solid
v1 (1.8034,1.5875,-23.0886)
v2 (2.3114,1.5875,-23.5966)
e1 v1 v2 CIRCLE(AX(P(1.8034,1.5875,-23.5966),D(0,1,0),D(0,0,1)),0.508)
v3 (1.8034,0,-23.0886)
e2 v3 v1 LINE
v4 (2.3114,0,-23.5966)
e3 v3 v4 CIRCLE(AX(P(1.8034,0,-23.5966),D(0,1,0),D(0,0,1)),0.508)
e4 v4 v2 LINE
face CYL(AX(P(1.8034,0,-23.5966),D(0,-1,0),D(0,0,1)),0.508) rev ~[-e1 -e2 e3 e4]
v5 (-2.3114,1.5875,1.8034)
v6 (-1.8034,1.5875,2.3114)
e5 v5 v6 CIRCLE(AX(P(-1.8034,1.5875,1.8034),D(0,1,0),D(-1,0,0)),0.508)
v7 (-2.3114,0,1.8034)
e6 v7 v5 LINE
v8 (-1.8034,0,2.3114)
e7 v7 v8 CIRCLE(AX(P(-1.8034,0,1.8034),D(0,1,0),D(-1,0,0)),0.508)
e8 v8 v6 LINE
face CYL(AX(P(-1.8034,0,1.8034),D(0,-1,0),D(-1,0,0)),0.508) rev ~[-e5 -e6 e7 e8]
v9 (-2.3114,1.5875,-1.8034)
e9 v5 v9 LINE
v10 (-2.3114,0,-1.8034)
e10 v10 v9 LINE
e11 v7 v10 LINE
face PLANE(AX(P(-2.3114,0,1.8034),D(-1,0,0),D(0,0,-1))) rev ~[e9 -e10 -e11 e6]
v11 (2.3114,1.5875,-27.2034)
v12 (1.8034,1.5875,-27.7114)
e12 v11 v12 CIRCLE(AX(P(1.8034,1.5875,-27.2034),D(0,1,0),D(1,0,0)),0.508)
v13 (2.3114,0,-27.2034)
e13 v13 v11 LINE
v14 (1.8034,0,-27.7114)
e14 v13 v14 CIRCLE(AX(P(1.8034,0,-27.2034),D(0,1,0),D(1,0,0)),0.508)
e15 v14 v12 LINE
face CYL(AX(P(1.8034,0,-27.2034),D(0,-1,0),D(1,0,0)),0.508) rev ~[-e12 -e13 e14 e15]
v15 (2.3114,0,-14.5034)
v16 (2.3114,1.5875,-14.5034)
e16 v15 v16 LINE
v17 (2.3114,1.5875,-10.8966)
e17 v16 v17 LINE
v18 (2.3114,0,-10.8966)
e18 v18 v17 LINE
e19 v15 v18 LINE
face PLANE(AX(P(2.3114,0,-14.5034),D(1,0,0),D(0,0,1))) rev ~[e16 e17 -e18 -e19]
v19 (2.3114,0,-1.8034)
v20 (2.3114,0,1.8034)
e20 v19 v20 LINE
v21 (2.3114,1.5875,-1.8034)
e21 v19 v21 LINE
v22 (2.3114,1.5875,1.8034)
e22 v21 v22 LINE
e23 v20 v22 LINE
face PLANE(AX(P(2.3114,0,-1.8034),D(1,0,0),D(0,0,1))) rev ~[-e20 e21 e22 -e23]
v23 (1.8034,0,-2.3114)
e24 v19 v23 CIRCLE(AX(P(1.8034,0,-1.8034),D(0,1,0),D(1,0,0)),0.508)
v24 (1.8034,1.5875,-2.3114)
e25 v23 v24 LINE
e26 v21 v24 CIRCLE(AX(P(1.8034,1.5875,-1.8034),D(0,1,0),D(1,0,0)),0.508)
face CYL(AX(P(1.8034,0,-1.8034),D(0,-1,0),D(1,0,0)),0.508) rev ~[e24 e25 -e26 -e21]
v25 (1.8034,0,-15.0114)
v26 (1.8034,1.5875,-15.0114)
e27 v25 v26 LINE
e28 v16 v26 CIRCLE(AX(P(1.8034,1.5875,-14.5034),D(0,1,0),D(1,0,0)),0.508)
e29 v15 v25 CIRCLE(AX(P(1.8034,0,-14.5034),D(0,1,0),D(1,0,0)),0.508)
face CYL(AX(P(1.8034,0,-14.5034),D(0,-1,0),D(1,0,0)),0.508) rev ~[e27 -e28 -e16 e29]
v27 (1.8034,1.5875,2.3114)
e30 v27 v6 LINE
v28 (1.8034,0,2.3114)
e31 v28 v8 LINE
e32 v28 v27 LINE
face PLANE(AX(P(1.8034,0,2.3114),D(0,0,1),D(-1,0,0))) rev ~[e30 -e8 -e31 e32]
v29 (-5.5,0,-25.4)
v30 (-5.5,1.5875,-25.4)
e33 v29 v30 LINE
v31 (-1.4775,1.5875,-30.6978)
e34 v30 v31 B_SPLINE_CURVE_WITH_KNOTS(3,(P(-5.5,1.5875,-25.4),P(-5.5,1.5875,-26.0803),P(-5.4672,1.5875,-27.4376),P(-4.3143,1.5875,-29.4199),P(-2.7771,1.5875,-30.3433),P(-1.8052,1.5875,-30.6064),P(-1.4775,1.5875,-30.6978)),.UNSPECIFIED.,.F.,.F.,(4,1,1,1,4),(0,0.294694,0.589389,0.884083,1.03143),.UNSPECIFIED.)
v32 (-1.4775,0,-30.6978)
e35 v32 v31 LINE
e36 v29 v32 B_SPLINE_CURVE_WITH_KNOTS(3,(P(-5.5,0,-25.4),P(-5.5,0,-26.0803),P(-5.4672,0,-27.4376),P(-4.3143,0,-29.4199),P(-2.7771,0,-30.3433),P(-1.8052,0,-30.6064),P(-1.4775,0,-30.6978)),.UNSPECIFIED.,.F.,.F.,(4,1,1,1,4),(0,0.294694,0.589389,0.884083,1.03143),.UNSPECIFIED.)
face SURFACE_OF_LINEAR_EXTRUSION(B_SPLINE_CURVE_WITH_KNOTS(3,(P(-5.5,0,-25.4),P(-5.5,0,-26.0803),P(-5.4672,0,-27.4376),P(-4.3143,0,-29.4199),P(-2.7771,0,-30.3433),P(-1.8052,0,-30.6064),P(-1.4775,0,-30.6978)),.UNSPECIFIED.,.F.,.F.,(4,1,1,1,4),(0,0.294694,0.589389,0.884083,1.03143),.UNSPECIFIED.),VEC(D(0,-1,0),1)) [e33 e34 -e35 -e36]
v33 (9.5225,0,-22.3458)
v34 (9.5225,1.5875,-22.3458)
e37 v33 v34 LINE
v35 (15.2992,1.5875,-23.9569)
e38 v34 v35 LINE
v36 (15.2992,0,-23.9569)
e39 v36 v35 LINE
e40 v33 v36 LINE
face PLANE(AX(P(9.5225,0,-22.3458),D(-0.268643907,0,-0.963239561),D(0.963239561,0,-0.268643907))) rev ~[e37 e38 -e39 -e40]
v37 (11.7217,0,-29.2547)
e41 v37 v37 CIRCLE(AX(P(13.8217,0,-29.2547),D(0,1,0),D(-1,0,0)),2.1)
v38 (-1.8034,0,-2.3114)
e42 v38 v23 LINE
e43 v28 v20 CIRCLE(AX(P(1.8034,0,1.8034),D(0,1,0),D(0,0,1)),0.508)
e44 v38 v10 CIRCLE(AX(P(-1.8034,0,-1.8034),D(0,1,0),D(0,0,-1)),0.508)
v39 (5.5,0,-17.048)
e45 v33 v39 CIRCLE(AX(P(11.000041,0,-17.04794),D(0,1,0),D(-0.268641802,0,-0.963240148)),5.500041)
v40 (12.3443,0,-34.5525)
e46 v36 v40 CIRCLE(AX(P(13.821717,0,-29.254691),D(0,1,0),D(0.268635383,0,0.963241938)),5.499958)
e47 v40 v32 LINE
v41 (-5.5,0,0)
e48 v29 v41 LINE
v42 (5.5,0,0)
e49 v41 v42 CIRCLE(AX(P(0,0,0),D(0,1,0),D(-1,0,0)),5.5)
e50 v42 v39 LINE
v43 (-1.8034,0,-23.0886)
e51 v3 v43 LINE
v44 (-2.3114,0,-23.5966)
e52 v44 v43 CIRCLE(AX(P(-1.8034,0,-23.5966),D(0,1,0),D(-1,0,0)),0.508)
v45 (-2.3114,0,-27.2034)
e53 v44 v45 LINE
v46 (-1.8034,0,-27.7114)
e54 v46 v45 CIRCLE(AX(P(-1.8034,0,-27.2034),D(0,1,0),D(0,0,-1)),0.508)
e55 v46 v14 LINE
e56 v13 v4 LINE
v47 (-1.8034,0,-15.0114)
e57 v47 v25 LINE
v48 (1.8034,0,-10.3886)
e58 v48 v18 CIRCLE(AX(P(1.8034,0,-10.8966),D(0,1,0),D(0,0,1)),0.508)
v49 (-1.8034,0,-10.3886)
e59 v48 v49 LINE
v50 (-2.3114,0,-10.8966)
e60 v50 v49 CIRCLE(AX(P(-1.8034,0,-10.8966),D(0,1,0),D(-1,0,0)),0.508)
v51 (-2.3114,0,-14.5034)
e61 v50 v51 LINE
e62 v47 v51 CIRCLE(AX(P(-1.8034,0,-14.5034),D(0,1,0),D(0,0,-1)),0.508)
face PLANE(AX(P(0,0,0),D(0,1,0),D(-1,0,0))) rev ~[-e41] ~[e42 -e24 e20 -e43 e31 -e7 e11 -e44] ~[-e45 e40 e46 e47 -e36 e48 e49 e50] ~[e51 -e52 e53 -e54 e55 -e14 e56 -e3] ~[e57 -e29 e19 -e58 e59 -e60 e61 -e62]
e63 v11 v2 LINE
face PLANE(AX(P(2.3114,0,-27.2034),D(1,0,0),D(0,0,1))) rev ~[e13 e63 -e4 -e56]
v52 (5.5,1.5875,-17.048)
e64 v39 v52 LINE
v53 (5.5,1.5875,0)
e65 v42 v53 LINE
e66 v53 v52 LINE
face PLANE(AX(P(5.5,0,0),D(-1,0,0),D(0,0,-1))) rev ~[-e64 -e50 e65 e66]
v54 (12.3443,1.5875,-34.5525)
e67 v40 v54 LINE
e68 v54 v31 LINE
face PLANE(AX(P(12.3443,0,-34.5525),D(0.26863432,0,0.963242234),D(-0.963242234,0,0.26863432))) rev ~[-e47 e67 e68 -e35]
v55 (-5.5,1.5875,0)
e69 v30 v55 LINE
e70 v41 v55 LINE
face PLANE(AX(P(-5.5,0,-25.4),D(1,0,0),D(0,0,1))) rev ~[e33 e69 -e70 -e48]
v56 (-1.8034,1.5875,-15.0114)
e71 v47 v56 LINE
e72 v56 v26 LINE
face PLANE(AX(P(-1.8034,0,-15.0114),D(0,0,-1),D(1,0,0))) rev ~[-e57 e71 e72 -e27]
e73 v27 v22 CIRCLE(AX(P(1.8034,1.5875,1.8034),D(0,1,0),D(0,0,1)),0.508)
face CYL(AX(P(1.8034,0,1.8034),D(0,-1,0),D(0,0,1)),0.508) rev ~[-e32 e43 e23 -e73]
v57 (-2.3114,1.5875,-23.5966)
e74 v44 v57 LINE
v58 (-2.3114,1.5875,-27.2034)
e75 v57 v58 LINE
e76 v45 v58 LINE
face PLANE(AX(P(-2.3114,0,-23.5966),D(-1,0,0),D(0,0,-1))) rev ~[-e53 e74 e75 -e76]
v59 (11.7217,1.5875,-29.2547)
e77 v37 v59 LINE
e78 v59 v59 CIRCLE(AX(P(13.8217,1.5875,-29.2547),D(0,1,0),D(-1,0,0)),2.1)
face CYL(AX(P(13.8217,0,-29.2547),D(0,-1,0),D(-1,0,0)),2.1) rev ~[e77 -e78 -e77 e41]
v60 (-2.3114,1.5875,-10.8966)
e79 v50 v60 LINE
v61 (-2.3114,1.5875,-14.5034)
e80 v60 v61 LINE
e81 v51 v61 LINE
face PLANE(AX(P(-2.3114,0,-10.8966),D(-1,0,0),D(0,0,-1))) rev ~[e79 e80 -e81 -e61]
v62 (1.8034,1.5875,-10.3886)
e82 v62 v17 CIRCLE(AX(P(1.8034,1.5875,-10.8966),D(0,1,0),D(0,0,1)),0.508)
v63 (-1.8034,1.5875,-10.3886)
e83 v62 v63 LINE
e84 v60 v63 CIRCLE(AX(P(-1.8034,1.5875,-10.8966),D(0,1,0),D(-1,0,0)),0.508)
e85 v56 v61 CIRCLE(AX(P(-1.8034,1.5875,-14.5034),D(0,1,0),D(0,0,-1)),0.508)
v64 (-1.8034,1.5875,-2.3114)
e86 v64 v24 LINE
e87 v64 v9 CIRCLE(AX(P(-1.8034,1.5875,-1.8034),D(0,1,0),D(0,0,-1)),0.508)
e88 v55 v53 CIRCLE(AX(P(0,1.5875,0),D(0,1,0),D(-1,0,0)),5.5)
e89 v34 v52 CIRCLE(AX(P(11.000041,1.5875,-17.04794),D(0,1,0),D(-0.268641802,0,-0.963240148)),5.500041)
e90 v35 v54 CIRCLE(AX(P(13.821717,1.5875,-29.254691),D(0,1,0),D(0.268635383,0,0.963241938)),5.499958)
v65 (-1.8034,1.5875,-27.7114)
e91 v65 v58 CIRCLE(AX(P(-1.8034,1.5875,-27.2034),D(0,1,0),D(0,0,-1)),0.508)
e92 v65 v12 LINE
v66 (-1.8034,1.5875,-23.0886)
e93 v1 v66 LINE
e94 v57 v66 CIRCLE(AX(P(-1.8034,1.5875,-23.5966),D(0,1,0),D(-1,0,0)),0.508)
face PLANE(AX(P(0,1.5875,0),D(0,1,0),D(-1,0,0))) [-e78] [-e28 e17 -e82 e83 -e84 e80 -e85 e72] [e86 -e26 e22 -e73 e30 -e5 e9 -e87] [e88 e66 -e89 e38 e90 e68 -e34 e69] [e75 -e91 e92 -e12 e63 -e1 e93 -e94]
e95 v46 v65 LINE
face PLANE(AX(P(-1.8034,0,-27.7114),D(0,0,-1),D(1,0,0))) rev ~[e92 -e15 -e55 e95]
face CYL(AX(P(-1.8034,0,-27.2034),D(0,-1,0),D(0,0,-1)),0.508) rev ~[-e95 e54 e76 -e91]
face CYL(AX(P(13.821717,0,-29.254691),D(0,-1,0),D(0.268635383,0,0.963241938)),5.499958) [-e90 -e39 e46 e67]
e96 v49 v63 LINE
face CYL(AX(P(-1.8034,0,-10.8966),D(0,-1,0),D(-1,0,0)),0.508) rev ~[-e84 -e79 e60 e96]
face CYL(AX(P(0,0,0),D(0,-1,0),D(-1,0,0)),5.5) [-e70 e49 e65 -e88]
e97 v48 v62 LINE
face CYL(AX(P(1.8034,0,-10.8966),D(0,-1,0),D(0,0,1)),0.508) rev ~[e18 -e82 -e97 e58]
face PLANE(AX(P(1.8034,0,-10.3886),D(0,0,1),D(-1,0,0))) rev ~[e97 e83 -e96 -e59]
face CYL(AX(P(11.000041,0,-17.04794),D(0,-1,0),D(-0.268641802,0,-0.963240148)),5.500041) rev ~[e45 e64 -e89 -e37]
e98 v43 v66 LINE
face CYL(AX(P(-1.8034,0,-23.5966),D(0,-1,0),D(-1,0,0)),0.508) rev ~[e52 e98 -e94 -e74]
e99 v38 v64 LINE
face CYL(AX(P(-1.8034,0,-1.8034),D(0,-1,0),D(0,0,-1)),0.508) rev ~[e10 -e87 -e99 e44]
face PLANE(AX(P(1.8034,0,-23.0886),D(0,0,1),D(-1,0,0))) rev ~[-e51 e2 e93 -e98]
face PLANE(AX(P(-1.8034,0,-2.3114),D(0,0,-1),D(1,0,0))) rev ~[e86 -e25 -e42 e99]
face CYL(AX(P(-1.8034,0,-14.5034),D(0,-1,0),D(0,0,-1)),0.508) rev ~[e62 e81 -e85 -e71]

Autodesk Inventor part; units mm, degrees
ref_plane "YZ Plane" through (0, 0, 0) normal (1, 0, 0) x (0, 1, 0)
ref_plane "XZ Plane" through (0, 0, 0) normal (0, 1, 0) x (-1, 0, 0)
ref_plane "XY Plane" through (0, 0, 0) normal (0, 0, 1) x (1, 0, 0)
sketch "main" plane through (0, 0, 0) normal (0, 0, 1) x (1, 0, 0)
  line L0 (-3.1973, -8.3156) -> (0.4095, -8.3156)
  arc A0 (-3.1973, -8.3156) -> (-3.7053, -8.8236) centre (-3.1973, -8.8236) ccw
  arc A1 (0.9175, -8.8236) -> (0.4095, -8.3156) centre (0.4095, -8.8236) ccw
  line L1 (-3.7053, -12.4304) -> (-3.7053, -8.8236)
  line L2 (0.9175, -8.8236) -> (0.9175, -12.4304)
  arc A2 (-3.7053, -12.4304) -> (-3.1973, -12.9384) centre (-3.1973, -12.4304) ccw
  line L3 (0.4095, -12.9384) -> (-3.1973, -12.9384)
  arc A3 (0.4095, -12.9384) -> (0.9175, -12.4304) centre (0.4095, -12.4304) ccw
  spline S0 degree 3 poles (4.1061, -10.627) (4.1061, -11.3073) (4.0733, -12.6645) (2.9205, -14.6469) (1.3832, -15.5703) (0.4113, -15.8334) (0.0836, -15.9248) knots 0 0 0 0 0.294694 0.589389 0.884083 1.03143 1.03143 1.03143 1.03143
  arc A4 (-10.9164, -7.5728) -> (-6.8939, -2.275) centre (-12.3939, -2.275) ccw
  line L4 (-13.7381, -19.7795) -> (0.0836, -15.9248)
  line L5 (-10.9164, -7.5728) -> (-16.6931, -9.1839)
  arc A5 (-16.6931, -9.1839) -> (-13.7381, -19.7795) centre (-15.2156, -14.4817) ccw
  circle A6 centre (-15.2156, -14.4817) radius 2.1
  line L6 (0.4095, -0.2384) -> (-3.1973, -0.2384)
  arc A7 (-3.7053, 0.2696) -> (-3.1973, -0.2384) centre (-3.1973, 0.2696) ccw
  line L7 (0.9175, 3.8764) -> (0.9175, 0.2696)
  line L8 (-3.7053, 0.2696) -> (-3.7053, 3.8764)
  line L9 (-3.1973, 4.3844) -> (0.4095, 4.3844)
  arc A8 (-3.1973, 4.3844) -> (-3.7053, 3.8764) centre (-3.1973, 3.8764) ccw
  arc A9 (0.9175, 3.8764) -> (0.4095, 4.3844) centre (0.4095, 3.8764) ccw
  arc A10 (0.4095, -0.2384) -> (0.9175, 0.2696) centre (0.4095, 0.2696) ccw
  line L10 (4.1061, -10.627) -> (4.1061, 14.773)
  arc A11 (4.1061, 14.773) -> (-6.8939, 14.773) centre (-1.3939, 14.773) ccw
  line L11 (-6.8939, 14.773) -> (-6.8939, -2.275)
  line L12 (0.4095, 12.4616) -> (-3.1973, 12.4616)
  arc A12 (0.4095, 12.4616) -> (0.9175, 12.9696) centre (0.4095, 12.9696) ccw
  arc A13 (-3.7053, 12.9696) -> (-3.1973, 12.4616) centre (-3.1973, 12.9696) ccw
  line L13 (0.9175, 16.5764) -> (0.9175, 12.9696)
  line L14 (-3.7053, 12.9696) -> (-3.7053, 16.5764)
  arc A14 (-3.1973, 17.0844) -> (-3.7053, 16.5764) centre (-3.1973, 16.5764) ccw
  arc A15 (0.9175, 16.5764) -> (0.4095, 17.0844) centre (0.4095, 16.5764) ccw
  line L15 (-3.1973, 17.0844) -> (0.4095, 17.0844)
  point P0 (-2.9609, 0.4438)
  point P1 (-20.5005, 14.8552)
sketch "Sketch1" plane through (0, 0, 0) normal (0, 1, 0) x (-1, 0, 0)
  line L0 (-1.8034, -23.0886) -> (1.8034, -23.0886)
  arc A0 (-1.8034, -23.0886) -> (-2.3114, -23.5966) centre (-1.8034, -23.5966) ccw
  arc A1 (2.3114, -23.5966) -> (1.8034, -23.0886) centre (1.8034, -23.5966) ccw
  line L1 (-2.3114, -27.2034) -> (-2.3114, -23.5966)
  line L2 (2.3114, -23.5966) -> (2.3114, -27.2034)
  arc A2 (-2.3114, -27.2034) -> (-1.8034, -27.7114) centre (-1.8034, -27.2034) ccw
  line L3 (1.8034, -27.7114) -> (-1.8034, -27.7114)
  arc A3 (1.8034, -27.7114) -> (2.3114, -27.2034) centre (1.8034, -27.2034) ccw
  spline S0 degree 3 poles (5.5, -25.4) (5.5, -26.0803) (5.4672, -27.4376) (4.3143, -29.4199) (2.7771, -30.3433) (1.8052, -30.6064) (1.4775, -30.6978) knots 0 0 0 0 0.294694 0.589389 0.884083 1.03143 1.03143 1.03143 1.03143
  arc A4 (-9.5225, -22.3458) -> (-5.5, -17.048) centre (-11, -17.048) ccw
  line L4 (-12.3443, -34.5525) -> (1.4775, -30.6978)
  line L5 (-9.5225, -22.3458) -> (-15.2992, -23.9569)
  arc A5 (-15.2992, -23.9569) -> (-12.3443, -34.5525) centre (-13.8217, -29.2547) ccw
  circle A6 centre (-13.8217, -29.2547) radius 2.1
  line L6 (1.8034, -15.0114) -> (-1.8034, -15.0114)
  arc A7 (-2.3114, -14.5034) -> (-1.8034, -15.0114) centre (-1.8034, -14.5034) ccw
  line L7 (2.3114, -10.8966) -> (2.3114, -14.5034)
  line L8 (-2.3114, -14.5034) -> (-2.3114, -10.8966)
  line L9 (-1.8034, -10.3886) -> (1.8034, -10.3886)
  arc A8 (-1.8034, -10.3886) -> (-2.3114, -10.8966) centre (-1.8034, -10.8966) ccw
  arc A9 (2.3114, -10.8966) -> (1.8034, -10.3886) centre (1.8034, -10.8966) ccw
  arc A10 (1.8034, -15.0114) -> (2.3114, -14.5034) centre (1.8034, -14.5034) ccw
  line L10 (5.5, -25.4) -> (5.5, 0)
  arc A11 (5.5, 0) -> (-5.5, 0) centre (0, 0) ccw
  line L11 (-5.5, 0) -> (-5.5, -17.048)
  line L12 (1.8034, -2.3114) -> (-1.8034, -2.3114)
  arc A12 (1.8034, -2.3114) -> (2.3114, -1.8034) centre (1.8034, -1.8034) ccw
  arc A13 (-2.3114, -1.8034) -> (-1.8034, -2.3114) centre (-1.8034, -1.8034) ccw
  line L13 (2.3114, 1.8034) -> (2.3114, -1.8034)
  line L14 (-2.3114, -1.8034) -> (-2.3114, 1.8034)
  arc A14 (-1.8034, 2.3114) -> (-2.3114, 1.8034) centre (-1.8034, 1.8034) ccw
  arc A15 (2.3114, 1.8034) -> (1.8034, 2.3114) centre (1.8034, 1.8034) ccw
  line L15 (-1.8034, 2.3114) -> (1.8034, 2.3114)
extrude "Extrusion1" add sketch "Sketch1" along normal blind 1.5875
properties part number "bent_gusset_nesting"
